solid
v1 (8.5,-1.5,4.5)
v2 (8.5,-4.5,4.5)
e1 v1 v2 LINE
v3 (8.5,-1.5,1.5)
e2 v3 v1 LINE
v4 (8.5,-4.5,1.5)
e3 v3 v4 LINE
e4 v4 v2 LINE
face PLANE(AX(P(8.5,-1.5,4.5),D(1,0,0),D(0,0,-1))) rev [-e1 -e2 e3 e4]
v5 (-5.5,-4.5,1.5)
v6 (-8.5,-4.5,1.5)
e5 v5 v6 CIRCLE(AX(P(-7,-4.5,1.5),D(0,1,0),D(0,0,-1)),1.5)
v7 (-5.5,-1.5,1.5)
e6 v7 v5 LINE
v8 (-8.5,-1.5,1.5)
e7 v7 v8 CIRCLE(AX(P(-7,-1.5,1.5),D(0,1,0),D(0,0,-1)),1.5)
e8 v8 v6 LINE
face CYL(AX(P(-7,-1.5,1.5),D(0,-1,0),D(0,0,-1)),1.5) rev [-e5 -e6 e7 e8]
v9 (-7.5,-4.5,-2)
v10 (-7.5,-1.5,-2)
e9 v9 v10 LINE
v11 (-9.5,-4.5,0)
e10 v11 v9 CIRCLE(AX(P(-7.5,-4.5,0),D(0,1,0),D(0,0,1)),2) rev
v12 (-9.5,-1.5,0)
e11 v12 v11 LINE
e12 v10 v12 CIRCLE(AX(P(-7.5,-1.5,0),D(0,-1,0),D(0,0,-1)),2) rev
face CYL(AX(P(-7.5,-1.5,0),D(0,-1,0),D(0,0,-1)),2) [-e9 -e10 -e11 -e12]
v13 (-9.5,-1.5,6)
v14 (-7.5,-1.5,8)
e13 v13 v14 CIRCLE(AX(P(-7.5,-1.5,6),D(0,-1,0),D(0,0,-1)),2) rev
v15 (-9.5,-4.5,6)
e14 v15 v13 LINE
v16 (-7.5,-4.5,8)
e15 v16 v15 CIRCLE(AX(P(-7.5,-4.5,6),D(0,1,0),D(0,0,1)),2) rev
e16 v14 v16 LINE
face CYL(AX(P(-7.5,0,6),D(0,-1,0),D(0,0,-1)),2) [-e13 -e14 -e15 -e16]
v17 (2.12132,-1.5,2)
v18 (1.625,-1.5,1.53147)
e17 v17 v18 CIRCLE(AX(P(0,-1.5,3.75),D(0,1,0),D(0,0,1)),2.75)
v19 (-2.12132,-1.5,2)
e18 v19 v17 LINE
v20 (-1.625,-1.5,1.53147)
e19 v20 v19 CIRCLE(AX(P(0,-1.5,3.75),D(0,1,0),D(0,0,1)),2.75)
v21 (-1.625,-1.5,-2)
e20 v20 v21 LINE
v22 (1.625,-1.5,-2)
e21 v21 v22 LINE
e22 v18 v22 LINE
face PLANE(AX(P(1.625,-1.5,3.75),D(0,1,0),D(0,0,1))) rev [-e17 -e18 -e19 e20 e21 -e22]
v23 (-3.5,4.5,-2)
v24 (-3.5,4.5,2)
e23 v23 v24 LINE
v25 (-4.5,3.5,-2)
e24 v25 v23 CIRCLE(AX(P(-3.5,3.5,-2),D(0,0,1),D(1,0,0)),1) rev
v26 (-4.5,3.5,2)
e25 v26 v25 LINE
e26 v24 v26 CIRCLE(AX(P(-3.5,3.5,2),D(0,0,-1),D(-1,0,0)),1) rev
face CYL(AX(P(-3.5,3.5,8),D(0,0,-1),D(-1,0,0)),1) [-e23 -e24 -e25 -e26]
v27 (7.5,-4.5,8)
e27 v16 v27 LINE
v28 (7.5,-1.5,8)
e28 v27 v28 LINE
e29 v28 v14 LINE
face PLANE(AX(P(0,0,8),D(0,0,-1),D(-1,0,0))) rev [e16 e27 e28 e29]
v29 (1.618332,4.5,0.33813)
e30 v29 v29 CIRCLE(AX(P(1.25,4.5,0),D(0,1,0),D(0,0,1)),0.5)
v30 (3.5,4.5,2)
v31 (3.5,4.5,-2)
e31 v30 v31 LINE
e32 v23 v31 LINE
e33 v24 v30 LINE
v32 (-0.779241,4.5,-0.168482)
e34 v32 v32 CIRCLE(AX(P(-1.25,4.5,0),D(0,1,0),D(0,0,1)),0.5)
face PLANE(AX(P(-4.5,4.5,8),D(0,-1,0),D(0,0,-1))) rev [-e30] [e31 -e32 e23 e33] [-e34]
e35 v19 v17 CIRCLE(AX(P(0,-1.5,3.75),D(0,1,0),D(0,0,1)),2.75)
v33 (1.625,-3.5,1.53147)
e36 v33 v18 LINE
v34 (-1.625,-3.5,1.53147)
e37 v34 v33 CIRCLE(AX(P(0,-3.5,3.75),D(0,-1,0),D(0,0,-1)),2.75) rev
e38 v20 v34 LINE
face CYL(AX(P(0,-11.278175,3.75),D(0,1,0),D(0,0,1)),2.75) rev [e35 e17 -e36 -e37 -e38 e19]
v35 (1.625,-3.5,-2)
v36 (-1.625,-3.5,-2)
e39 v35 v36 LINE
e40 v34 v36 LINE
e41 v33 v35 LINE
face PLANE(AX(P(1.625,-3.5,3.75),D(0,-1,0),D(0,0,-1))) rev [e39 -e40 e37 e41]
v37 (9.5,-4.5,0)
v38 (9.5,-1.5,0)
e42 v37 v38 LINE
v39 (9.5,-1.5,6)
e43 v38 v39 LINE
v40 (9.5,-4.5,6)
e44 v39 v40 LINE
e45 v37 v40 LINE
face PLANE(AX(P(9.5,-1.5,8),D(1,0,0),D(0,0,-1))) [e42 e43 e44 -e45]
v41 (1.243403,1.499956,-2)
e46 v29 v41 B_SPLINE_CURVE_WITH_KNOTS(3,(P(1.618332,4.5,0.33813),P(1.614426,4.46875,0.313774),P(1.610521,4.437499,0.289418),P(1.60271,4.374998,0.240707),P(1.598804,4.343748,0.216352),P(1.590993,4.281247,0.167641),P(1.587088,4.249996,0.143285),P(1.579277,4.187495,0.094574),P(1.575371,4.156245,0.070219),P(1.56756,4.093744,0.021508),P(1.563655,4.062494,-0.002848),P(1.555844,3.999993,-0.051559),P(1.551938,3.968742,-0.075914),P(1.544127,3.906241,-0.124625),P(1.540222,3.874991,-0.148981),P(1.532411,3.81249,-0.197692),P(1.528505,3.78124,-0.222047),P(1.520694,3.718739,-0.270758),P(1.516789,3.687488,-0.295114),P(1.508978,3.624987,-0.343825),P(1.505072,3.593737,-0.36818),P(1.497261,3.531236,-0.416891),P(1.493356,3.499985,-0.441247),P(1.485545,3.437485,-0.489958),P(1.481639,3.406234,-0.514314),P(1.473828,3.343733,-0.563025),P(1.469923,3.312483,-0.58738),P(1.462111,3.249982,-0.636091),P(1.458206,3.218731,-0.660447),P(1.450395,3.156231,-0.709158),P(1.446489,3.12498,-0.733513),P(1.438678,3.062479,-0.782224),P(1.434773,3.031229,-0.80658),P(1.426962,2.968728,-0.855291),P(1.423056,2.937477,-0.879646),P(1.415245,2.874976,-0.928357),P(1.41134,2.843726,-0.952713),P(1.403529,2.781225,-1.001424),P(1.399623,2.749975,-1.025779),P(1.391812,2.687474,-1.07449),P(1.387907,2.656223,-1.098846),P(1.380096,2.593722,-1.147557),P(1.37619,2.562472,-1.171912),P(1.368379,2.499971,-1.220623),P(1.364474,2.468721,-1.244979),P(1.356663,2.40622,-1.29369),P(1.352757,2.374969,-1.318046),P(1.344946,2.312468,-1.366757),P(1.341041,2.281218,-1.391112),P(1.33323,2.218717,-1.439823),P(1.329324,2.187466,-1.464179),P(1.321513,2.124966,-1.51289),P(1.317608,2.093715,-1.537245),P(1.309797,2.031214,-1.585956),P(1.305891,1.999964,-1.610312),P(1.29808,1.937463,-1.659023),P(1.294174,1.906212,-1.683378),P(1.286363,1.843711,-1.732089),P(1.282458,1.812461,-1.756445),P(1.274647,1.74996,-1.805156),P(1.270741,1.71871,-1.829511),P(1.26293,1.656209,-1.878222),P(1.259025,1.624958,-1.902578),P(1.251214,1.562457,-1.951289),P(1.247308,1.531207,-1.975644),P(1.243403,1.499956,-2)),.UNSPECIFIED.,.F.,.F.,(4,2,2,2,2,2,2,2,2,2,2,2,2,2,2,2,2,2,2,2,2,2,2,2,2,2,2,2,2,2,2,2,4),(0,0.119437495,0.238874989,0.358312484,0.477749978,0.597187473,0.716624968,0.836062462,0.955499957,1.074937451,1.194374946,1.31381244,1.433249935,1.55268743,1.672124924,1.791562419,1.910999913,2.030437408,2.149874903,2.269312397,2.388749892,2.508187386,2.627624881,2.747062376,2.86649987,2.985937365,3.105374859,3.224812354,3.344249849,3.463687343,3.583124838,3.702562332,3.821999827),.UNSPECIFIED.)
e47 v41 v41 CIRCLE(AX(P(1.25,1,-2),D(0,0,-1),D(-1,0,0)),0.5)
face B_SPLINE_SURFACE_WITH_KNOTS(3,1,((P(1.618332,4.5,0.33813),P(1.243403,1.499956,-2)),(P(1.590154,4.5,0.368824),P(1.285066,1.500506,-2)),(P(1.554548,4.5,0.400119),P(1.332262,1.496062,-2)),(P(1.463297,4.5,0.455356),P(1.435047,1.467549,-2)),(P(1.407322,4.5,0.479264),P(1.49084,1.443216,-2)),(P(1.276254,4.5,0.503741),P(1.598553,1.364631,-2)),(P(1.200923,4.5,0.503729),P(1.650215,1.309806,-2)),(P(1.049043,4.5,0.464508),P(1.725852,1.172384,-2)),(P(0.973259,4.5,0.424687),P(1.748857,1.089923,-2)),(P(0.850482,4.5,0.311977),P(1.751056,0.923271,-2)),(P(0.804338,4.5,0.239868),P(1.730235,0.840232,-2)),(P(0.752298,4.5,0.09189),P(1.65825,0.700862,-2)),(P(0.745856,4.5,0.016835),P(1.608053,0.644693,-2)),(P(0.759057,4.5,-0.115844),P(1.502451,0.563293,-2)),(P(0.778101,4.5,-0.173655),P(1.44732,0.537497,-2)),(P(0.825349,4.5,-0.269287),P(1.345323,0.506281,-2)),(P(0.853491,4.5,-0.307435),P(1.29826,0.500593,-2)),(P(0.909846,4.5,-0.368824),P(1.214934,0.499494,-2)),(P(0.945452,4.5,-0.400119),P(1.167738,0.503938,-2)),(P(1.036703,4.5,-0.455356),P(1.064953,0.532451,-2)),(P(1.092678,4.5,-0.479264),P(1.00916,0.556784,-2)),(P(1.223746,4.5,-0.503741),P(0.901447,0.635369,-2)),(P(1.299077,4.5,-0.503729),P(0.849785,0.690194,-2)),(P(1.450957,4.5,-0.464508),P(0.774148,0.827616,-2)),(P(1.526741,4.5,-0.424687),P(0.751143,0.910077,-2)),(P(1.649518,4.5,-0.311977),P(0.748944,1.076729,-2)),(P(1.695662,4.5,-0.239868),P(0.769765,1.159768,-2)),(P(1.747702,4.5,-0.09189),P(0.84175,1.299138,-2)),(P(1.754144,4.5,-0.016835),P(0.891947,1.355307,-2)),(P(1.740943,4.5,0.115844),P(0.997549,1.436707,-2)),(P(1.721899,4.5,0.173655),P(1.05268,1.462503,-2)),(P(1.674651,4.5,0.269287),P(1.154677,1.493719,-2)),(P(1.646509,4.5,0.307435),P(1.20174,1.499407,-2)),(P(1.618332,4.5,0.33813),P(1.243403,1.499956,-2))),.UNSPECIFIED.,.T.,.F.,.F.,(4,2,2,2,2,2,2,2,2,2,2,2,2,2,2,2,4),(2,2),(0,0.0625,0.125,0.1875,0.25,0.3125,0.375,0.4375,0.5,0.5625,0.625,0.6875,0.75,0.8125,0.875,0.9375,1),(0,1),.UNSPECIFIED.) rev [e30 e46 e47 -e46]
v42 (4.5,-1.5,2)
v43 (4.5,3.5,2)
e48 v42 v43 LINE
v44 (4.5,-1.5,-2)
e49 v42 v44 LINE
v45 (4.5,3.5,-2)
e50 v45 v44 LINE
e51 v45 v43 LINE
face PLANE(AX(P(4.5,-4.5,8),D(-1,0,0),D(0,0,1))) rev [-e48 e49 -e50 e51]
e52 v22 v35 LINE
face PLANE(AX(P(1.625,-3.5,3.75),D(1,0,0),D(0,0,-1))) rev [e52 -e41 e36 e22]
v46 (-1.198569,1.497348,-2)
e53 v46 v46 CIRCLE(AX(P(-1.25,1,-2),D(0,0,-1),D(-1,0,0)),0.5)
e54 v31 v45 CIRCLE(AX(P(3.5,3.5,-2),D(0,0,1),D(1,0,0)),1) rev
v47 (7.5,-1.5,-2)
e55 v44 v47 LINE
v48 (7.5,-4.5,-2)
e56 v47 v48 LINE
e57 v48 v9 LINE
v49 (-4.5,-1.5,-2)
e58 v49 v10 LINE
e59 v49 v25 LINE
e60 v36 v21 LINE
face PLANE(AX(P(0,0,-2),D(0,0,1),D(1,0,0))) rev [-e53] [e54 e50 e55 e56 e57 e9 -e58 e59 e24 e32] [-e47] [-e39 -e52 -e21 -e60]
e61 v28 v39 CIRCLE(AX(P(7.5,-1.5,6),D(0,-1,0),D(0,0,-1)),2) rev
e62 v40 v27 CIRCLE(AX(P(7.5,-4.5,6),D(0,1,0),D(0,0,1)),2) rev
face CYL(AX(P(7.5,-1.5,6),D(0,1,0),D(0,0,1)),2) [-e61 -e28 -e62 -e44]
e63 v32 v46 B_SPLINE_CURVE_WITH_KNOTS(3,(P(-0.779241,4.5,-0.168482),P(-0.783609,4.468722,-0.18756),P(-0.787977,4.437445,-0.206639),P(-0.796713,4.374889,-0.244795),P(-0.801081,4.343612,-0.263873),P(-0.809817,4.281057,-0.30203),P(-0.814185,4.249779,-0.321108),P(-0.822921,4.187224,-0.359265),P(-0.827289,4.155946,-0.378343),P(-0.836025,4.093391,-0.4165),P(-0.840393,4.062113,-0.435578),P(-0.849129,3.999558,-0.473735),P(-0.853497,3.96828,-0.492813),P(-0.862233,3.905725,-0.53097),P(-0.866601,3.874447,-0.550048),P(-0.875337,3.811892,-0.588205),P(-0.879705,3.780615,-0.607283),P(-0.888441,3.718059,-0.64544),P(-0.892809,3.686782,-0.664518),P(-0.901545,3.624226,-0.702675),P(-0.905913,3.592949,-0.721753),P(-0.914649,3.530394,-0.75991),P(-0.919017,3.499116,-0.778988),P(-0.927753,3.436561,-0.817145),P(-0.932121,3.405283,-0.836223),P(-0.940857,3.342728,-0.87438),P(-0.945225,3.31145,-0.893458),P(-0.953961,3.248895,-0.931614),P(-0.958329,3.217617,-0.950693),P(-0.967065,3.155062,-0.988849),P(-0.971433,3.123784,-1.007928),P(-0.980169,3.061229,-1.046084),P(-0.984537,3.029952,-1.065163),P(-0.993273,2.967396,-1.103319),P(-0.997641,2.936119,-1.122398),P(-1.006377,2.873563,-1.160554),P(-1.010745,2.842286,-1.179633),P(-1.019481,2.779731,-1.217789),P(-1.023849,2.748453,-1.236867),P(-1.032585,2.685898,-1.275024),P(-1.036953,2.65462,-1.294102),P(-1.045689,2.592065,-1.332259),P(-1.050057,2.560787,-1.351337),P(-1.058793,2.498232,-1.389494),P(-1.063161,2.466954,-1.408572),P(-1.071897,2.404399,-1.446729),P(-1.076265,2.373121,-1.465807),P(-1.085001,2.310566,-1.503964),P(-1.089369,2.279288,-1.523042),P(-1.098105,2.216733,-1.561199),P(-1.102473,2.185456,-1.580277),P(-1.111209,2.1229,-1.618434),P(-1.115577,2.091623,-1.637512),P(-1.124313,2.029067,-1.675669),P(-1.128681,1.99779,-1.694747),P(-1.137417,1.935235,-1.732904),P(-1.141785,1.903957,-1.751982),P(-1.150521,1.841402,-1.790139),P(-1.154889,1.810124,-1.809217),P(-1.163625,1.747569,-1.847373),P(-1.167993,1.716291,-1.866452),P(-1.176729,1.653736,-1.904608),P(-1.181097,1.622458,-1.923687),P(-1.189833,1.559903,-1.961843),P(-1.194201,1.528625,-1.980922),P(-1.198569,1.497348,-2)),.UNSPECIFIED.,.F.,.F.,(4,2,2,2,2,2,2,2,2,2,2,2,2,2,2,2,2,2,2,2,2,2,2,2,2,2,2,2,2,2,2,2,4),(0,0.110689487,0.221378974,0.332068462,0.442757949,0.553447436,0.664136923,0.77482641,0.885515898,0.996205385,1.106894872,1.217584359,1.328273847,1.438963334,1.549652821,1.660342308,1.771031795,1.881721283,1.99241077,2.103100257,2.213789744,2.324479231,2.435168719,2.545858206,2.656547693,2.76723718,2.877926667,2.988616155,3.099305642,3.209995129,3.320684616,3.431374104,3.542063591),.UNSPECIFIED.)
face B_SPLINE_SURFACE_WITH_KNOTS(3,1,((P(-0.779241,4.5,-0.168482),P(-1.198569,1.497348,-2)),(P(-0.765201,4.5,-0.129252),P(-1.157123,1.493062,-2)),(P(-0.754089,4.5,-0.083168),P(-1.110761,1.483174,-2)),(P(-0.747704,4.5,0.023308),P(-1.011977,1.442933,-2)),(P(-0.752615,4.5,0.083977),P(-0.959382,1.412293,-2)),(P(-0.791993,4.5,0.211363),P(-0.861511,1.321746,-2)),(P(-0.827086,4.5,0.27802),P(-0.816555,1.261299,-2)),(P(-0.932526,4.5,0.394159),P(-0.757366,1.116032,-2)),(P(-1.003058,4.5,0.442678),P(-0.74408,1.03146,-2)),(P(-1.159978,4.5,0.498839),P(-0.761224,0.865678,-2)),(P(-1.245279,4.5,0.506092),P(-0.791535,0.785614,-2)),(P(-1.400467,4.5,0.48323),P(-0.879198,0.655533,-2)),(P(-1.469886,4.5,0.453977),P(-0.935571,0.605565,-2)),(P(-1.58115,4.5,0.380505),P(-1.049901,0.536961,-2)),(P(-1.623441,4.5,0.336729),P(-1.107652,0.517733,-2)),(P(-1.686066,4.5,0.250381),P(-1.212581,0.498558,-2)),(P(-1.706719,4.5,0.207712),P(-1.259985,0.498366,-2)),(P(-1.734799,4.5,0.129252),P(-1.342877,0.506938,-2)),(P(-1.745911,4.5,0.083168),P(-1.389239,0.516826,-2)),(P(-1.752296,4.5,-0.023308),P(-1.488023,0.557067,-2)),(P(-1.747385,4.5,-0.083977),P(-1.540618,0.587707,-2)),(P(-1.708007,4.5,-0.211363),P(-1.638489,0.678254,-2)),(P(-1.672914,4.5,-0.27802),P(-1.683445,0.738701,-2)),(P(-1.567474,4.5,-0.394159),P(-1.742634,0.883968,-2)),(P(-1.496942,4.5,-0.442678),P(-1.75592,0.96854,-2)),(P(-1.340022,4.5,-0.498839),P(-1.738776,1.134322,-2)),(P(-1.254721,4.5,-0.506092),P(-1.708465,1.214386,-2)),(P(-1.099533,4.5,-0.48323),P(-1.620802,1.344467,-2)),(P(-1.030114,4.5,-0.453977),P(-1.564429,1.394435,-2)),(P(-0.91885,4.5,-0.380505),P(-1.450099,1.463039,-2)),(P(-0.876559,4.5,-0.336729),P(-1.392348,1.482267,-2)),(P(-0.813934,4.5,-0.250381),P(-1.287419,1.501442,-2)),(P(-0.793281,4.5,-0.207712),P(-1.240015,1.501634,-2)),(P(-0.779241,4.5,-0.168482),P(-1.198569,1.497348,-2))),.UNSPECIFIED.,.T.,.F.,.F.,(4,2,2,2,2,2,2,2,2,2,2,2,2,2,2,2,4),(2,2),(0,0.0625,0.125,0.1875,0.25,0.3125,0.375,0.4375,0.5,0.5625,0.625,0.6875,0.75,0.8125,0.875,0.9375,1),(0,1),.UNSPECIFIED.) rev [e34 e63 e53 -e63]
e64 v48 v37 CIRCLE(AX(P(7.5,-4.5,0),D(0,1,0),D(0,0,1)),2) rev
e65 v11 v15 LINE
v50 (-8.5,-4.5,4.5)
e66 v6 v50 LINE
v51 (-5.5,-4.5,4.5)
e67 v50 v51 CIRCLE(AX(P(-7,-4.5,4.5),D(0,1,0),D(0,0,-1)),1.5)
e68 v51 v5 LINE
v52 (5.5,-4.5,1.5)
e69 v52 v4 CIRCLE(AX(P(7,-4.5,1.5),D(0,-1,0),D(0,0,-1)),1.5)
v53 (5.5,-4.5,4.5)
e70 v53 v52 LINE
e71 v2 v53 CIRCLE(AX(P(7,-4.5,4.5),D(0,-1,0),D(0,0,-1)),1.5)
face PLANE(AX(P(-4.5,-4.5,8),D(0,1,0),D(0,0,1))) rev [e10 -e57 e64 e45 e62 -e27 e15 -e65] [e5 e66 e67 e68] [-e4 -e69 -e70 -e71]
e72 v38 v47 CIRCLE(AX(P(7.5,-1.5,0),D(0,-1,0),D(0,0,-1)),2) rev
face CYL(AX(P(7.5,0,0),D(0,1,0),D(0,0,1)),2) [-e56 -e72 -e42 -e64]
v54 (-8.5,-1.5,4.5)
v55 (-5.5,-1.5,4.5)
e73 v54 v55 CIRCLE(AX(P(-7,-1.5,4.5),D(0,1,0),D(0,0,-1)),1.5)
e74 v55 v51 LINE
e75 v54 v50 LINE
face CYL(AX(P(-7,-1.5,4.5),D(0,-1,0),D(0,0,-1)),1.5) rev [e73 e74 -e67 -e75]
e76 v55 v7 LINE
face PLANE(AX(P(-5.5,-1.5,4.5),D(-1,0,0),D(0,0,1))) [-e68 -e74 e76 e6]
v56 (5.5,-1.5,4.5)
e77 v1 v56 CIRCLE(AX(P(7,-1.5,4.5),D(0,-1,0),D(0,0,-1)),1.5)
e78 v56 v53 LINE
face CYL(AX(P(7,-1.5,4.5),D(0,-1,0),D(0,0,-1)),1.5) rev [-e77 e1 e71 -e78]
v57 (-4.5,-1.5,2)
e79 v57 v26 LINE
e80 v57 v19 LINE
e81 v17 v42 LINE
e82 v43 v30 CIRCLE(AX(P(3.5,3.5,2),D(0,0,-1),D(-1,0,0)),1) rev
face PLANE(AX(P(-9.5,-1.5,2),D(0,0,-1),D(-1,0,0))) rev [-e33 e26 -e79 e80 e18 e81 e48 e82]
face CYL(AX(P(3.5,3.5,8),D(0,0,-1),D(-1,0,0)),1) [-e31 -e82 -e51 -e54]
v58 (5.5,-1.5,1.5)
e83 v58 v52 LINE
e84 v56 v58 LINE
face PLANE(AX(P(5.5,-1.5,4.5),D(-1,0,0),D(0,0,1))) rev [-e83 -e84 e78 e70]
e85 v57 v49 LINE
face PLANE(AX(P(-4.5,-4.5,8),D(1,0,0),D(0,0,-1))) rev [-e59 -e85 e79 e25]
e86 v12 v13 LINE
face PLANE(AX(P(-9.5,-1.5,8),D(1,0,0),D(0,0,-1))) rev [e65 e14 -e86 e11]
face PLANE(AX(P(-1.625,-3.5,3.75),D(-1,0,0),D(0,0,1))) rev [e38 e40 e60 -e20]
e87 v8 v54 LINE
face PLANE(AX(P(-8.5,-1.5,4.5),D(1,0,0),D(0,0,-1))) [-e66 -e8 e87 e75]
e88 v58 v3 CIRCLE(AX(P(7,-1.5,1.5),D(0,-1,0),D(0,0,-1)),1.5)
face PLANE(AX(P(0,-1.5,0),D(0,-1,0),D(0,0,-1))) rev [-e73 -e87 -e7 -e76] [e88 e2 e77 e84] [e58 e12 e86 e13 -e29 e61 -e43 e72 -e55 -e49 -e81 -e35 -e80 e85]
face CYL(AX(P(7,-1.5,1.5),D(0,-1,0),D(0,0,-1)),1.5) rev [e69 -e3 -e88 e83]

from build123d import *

# Parameters (mm, degrees)
SKETCH1_W            = 9
SKETCH1_H            = 9
BOSS_EXTRUDE1_DEPTH  = 8
SKETCH3_W            = 9
SKETCH3_H            = 9
BOSS_EXTRUDE2_DEPTH  = 2
SKETCH5_W            = 5
SKETCH5_H            = 10
BOSS_EXTRUDE3_DEPTH  = 3
FILLET1_R            = 2
FILLET1_OF_MIRROR2_R = 2
FILLET2_R            = 1
SKETCH6_W            = 3.25
SKETCH6_H            = 2
CUT_EXTRUDE1_DEPTH   = 5.75
SKETCH7_W            = 6
SKETCH7_H            = 6
CUT_EXTRUDE2_DEPTH   = 17.740669043
SKETCH8_R            = 2.75
CUT_EXTRUDE3_DEPTH   = 2


with BuildPart() as part:
    # Sketch1 → Boss-Extrude1 (new body)
    with BuildSketch(Plane.XY):
        Rectangle(SKETCH1_W, SKETCH1_H)
    extrude(amount=BOSS_EXTRUDE1_DEPTH)

    # Sketch3 → Boss-Extrude2 (add)
    with BuildSketch(Plane(origin=(0, 0, 0), x_dir=(-1, 0, 0), z_dir=(0, 0, -1))):
        Rectangle(SKETCH3_W, SKETCH3_H)
    extrude(amount=BOSS_EXTRUDE2_DEPTH)

    # Sketch5 → Boss-Extrude3 (add)
    with BuildSketch(Plane.XZ.offset(4.5)):
        with Locations((7, 3)):
            Rectangle(SKETCH5_W, SKETCH5_H)
        with BuildLine():
            Line((8.5, 4.5), (8.5, 1.5))
            ThreePointArc((8.5, 1.5), (7, 0), (5.5, 1.5))
            Line((5.5, 1.5), (5.5, 4.5))
            ThreePointArc((5.5, 4.5), (7, 6), (8.5, 4.5))
        make_face(mode=Mode.SUBTRACT)
    boss_extrude3 = extrude(amount=-BOSS_EXTRUDE3_DEPTH)

    # Fillet1
    fillet1_edges = [part.edges().sort_by_distance(p)[0] for p in [
        (9.5, -3, -2),
        (9.5, -3, 8),
    ]]
    fillet(fillet1_edges, radius=FILLET1_R)

    # Mirror2: Boss-Extrude3 across plane
    add(boss_extrude3.mirror(Plane(origin=(0, 0, 0), x_dir=(0, 0, 1), z_dir=(1, 0, 0))))

    # Fillet1 of Mirror2
    fillet1_of_mirror2_edges = [part.edges().sort_by_distance(p)[0] for p in [
        (-9.5, -3, -2),
        (-9.5, -3, 8),
    ]]
    fillet(fillet1_of_mirror2_edges, radius=FILLET1_OF_MIRROR2_R)

    # Fillet2
    fillet2_edges = [part.edges().sort_by_distance(p)[0] for p in [
        (4.5, 4.5, 3),
        (-4.5, 4.5, 3),
    ]]
    fillet(fillet2_edges, radius=FILLET2_R)

    # Sketch6 → Cut-Extrude1 (cut)
    with BuildSketch(Plane(origin=(0, 0, -2), x_dir=(-1, 0, 0), z_dir=(0, 0, -1))):
        with Locations((0, -2.5)):
            Rectangle(SKETCH6_W, SKETCH6_H)
    extrude(amount=-CUT_EXTRUDE1_DEPTH, mode=Mode.SUBTRACT)

    # Sketch7 → Cut-Extrude2 (cut, through all)
    with BuildSketch(Plane(origin=(4.5, 0, 0), x_dir=(0, 0, -1), z_dir=(1, 0, 0))):
        with Locations((-5, 1.5)):
            Rectangle(SKETCH7_W, SKETCH7_H)
    extrude(amount=-CUT_EXTRUDE2_DEPTH, mode=Mode.SUBTRACT)

    # Sketch8 → Cut-Extrude3 (cut)
    with BuildSketch(Plane(origin=(0, -1.5, 0), x_dir=(1, 0, 0), z_dir=(0, 1, 0))):
        with Locations((0, -3.75)):
            Circle(SKETCH8_R)
    extrude(amount=-CUT_EXTRUDE3_DEPTH, mode=Mode.SUBTRACT)

    # Cut-Loft1: read off the stored shape, not the designer's step
    # Cut-Loft1: loft between two sections, ruled curve by curve
    cut_loft1_from = [
        Edge.make_bspline([(1.618331944, 4.5, 0.33812953), (1.590154483, 4.5, 0.368823859), (1.554547709, 4.5, 0.400118904), (1.463297086, 4.5, 0.455355682), (1.407321542, 4.5, 0.479264412), (1.276254131, 4.5, 0.503741169), (1.200923259, 4.5, 0.503729048), (1.049042928, 4.5, 0.464508058), (0.973259127, 4.5, 0.424686865), (0.850481812, 4.5, 0.311977022), (0.804337969, 4.5, 0.23986837), (0.752297501, 4.5, 0.09188962), (0.745856132, 4.5, 0.016834645), (0.759057321, 4.5, -0.115843561), (0.778101449, 4.5, -0.173655412), (0.825348682, 4.5, -0.269287398), (0.853490596, 4.5, -0.307435202), (0.909845517, 4.5, -0.368823859), (0.945452291, 4.5, -0.400118904), (1.036702914, 4.5, -0.455355682), (1.092678458, 4.5, -0.479264412), (1.223745869, 4.5, -0.503741169), (1.299076741, 4.5, -0.503729048), (1.450957072, 4.5, -0.464508058), (1.526740873, 4.5, -0.424686865), (1.649518188, 4.5, -0.311977022), (1.695662031, 4.5, -0.23986837), (1.747702499, 4.5, -0.09188962), (1.754143868, 4.5, -0.016834645), (1.740942679, 4.5, 0.115843561), (1.721898551, 4.5, 0.173655412), (1.674651318, 4.5, 0.269287398), (1.646509404, 4.5, 0.307435202), (1.618331944, 4.5, 0.33812953)], [0, 0, 0, 0, 0.0625, 0.0625, 0.125, 0.125, 0.1875, 0.1875, 0.25, 0.25, 0.3125, 0.3125, 0.375, 0.375, 0.4375, 0.4375, 0.5, 0.5, 0.5625, 0.5625, 0.625, 0.625, 0.6875, 0.6875, 0.75, 0.75, 0.8125, 0.8125, 0.875, 0.875, 0.9375, 0.9375, 1, 1, 1, 1], 3),
    ]
    cut_loft1_to = [
        Edge.make_bspline([(1.243402847, 1.499956476, -2), (1.285065886, 1.500506238, -2), (1.332261968, 1.496061904, -2), (1.435047124, 1.467548935, -2), (1.4908397, 1.443216294, -2), (1.598552626, 1.364630651, -2), (1.650214755, 1.309805794, -2), (1.725852293, 1.172383512, -2), (1.74885695, 1.089923232, -2), (1.751056001, 0.923271074, -2), (1.730235177, 0.840232497, -2), (1.658250042, 0.700862267, -2), (1.608052526, 0.644693326, -2), (1.502450689, 0.563292897, -2), (1.447319588, 0.537496568, -2), (1.345322572, 0.506281404, -2), (1.298260193, 0.500593287, -2), (1.214934114, 0.499493762, -2), (1.167738032, 0.503938096, -2), (1.064952876, 0.532451065, -2), (1.0091603, 0.556783706, -2), (0.901447374, 0.635369349, -2), (0.849785245, 0.690194206, -2), (0.774147707, 0.827616488, -2), (0.75114305, 0.910076768, -2), (0.748943999, 1.076728926, -2), (0.769764823, 1.159767503, -2), (0.841749958, 1.299137733, -2), (0.891947474, 1.355306674, -2), (0.997549311, 1.436707103, -2), (1.052680412, 1.462503432, -2), (1.154677428, 1.493718596, -2), (1.201739807, 1.499406713, -2), (1.243402847, 1.499956476, -2)], [0, 0, 0, 0, 0.0625, 0.0625, 0.125, 0.125, 0.1875, 0.1875, 0.25, 0.25, 0.3125, 0.3125, 0.375, 0.375, 0.4375, 0.4375, 0.5, 0.5, 0.5625, 0.5625, 0.625, 0.625, 0.6875, 0.6875, 0.75, 0.75, 0.8125, 0.8125, 0.875, 0.875, 0.9375, 0.9375, 1, 1, 1, 1], 3),
    ]
    cut_loft1 = Solid(Shell([*[Face.make_surface_from_curves(cut_loft1_from[k], cut_loft1_to[k]) for k in range(1)], Face(Wire(cut_loft1_from)), Face(Wire(cut_loft1_to))]))
    add(cut_loft1, mode=Mode.SUBTRACT)

    # Cut-Loft2: read off the stored shape, not the designer's step
    # Cut-Loft2: loft between two sections, ruled curve by curve
    cut_loft2_from = [
        Edge.make_bspline([(-0.779241198, 4.5, -0.168481901), (-0.76520104, 4.5, -0.129252), (-0.754089169, 4.5, -0.083167854), (-0.747704068, 4.5, 0.023307534), (-0.752614517, 4.5, 0.083976936), (-0.79199312, 4.5, 0.211362585), (-0.827085975, 4.5, 0.278020157), (-0.932525917, 4.5, 0.394159468), (-1.003058299, 4.5, 0.442678485), (-1.1599779, 4.5, 0.498839118), (-1.245279169, 4.5, 0.506092081), (-1.400466938, 4.5, 0.483229946), (-1.469885794, 4.5, 0.453976521), (-1.581150008, 4.5, 0.380505081), (-1.623440974, 4.5, 0.336728797), (-1.68606606, 4.5, 0.25038138), (-1.706718643, 4.5, 0.207711801), (-1.73479896, 4.5, 0.129252), (-1.745910831, 4.5, 0.083167854), (-1.752295932, 4.5, -0.023307534), (-1.747385483, 4.5, -0.083976936), (-1.70800688, 4.5, -0.211362585), (-1.672914025, 4.5, -0.278020157), (-1.567474083, 4.5, -0.394159468), (-1.496941701, 4.5, -0.442678485), (-1.3400221, 4.5, -0.498839118), (-1.254720831, 4.5, -0.506092081), (-1.099533062, 4.5, -0.483229946), (-1.030114206, 4.5, -0.453976521), (-0.918849992, 4.5, -0.380505081), (-0.876559026, 4.5, -0.336728797), (-0.81393394, 4.5, -0.25038138), (-0.793281357, 4.5, -0.207711801), (-0.779241198, 4.5, -0.168481901)], [0, 0, 0, 0, 0.0625, 0.0625, 0.125, 0.125, 0.1875, 0.1875, 0.25, 0.25, 0.3125, 0.3125, 0.375, 0.375, 0.4375, 0.4375, 0.5, 0.5, 0.5625, 0.5625, 0.625, 0.625, 0.6875, 0.6875, 0.75, 0.75, 0.8125, 0.8125, 0.875, 0.875, 0.9375, 0.9375, 1, 1, 1, 1], 3),
    ]
    cut_loft2_to = [
        Edge.make_bspline([(-1.19856901, 1.497347819, -2), (-1.157123358, 1.493061903, -2), (-1.110761205, 1.483173884, -2), (-1.011976516, 1.442932574, -2), (-0.959382471, 1.412293459, -2), (-0.861510562, 1.321745864, -2), (-0.816555497, 1.261299336, -2), (-0.757366243, 1.116032158, -2), (-0.744080349, 1.031460313, -2), (-0.761224012, 0.865677707, -2), (-0.791534928, 0.78561423, -2), (-0.879198087, 0.655533134, -2), (-0.935571187, 0.605565004, -2), (-1.049901014, 0.536961297, -2), (-1.107651872, 0.517733005, -2), (-1.21258085, 0.498557828, -2), (-1.259985338, 0.498366265, -2), (-1.342876642, 0.506938097, -2), (-1.389238795, 0.516826116, -2), (-1.488023484, 0.557067426, -2), (-1.540617529, 0.587706541, -2), (-1.638489438, 0.678254136, -2), (-1.683444503, 0.738700664, -2), (-1.742633757, 0.883967842, -2), (-1.755919651, 0.968539687, -2), (-1.738775988, 1.134322293, -2), (-1.708465072, 1.21438577, -2), (-1.620801913, 1.344466866, -2), (-1.564428813, 1.394434996, -2), (-1.450098986, 1.463038703, -2), (-1.392348128, 1.482266995, -2), (-1.28741915, 1.501442172, -2), (-1.240014662, 1.501633735, -2), (-1.19856901, 1.497347819, -2)], [0, 0, 0, 0, 0.0625, 0.0625, 0.125, 0.125, 0.1875, 0.1875, 0.25, 0.25, 0.3125, 0.3125, 0.375, 0.375, 0.4375, 0.4375, 0.5, 0.5, 0.5625, 0.5625, 0.625, 0.625, 0.6875, 0.6875, 0.75, 0.75, 0.8125, 0.8125, 0.875, 0.875, 0.9375, 0.9375, 1, 1, 1, 1], 3),
    ]
    cut_loft2 = Solid(Shell([*[Face.make_surface_from_curves(cut_loft2_from[k], cut_loft2_to[k]) for k in range(1)], Face(Wire(cut_loft2_from)), Face(Wire(cut_loft2_to))]))
    add(cut_loft2, mode=Mode.SUBTRACT)


solid = part.part
